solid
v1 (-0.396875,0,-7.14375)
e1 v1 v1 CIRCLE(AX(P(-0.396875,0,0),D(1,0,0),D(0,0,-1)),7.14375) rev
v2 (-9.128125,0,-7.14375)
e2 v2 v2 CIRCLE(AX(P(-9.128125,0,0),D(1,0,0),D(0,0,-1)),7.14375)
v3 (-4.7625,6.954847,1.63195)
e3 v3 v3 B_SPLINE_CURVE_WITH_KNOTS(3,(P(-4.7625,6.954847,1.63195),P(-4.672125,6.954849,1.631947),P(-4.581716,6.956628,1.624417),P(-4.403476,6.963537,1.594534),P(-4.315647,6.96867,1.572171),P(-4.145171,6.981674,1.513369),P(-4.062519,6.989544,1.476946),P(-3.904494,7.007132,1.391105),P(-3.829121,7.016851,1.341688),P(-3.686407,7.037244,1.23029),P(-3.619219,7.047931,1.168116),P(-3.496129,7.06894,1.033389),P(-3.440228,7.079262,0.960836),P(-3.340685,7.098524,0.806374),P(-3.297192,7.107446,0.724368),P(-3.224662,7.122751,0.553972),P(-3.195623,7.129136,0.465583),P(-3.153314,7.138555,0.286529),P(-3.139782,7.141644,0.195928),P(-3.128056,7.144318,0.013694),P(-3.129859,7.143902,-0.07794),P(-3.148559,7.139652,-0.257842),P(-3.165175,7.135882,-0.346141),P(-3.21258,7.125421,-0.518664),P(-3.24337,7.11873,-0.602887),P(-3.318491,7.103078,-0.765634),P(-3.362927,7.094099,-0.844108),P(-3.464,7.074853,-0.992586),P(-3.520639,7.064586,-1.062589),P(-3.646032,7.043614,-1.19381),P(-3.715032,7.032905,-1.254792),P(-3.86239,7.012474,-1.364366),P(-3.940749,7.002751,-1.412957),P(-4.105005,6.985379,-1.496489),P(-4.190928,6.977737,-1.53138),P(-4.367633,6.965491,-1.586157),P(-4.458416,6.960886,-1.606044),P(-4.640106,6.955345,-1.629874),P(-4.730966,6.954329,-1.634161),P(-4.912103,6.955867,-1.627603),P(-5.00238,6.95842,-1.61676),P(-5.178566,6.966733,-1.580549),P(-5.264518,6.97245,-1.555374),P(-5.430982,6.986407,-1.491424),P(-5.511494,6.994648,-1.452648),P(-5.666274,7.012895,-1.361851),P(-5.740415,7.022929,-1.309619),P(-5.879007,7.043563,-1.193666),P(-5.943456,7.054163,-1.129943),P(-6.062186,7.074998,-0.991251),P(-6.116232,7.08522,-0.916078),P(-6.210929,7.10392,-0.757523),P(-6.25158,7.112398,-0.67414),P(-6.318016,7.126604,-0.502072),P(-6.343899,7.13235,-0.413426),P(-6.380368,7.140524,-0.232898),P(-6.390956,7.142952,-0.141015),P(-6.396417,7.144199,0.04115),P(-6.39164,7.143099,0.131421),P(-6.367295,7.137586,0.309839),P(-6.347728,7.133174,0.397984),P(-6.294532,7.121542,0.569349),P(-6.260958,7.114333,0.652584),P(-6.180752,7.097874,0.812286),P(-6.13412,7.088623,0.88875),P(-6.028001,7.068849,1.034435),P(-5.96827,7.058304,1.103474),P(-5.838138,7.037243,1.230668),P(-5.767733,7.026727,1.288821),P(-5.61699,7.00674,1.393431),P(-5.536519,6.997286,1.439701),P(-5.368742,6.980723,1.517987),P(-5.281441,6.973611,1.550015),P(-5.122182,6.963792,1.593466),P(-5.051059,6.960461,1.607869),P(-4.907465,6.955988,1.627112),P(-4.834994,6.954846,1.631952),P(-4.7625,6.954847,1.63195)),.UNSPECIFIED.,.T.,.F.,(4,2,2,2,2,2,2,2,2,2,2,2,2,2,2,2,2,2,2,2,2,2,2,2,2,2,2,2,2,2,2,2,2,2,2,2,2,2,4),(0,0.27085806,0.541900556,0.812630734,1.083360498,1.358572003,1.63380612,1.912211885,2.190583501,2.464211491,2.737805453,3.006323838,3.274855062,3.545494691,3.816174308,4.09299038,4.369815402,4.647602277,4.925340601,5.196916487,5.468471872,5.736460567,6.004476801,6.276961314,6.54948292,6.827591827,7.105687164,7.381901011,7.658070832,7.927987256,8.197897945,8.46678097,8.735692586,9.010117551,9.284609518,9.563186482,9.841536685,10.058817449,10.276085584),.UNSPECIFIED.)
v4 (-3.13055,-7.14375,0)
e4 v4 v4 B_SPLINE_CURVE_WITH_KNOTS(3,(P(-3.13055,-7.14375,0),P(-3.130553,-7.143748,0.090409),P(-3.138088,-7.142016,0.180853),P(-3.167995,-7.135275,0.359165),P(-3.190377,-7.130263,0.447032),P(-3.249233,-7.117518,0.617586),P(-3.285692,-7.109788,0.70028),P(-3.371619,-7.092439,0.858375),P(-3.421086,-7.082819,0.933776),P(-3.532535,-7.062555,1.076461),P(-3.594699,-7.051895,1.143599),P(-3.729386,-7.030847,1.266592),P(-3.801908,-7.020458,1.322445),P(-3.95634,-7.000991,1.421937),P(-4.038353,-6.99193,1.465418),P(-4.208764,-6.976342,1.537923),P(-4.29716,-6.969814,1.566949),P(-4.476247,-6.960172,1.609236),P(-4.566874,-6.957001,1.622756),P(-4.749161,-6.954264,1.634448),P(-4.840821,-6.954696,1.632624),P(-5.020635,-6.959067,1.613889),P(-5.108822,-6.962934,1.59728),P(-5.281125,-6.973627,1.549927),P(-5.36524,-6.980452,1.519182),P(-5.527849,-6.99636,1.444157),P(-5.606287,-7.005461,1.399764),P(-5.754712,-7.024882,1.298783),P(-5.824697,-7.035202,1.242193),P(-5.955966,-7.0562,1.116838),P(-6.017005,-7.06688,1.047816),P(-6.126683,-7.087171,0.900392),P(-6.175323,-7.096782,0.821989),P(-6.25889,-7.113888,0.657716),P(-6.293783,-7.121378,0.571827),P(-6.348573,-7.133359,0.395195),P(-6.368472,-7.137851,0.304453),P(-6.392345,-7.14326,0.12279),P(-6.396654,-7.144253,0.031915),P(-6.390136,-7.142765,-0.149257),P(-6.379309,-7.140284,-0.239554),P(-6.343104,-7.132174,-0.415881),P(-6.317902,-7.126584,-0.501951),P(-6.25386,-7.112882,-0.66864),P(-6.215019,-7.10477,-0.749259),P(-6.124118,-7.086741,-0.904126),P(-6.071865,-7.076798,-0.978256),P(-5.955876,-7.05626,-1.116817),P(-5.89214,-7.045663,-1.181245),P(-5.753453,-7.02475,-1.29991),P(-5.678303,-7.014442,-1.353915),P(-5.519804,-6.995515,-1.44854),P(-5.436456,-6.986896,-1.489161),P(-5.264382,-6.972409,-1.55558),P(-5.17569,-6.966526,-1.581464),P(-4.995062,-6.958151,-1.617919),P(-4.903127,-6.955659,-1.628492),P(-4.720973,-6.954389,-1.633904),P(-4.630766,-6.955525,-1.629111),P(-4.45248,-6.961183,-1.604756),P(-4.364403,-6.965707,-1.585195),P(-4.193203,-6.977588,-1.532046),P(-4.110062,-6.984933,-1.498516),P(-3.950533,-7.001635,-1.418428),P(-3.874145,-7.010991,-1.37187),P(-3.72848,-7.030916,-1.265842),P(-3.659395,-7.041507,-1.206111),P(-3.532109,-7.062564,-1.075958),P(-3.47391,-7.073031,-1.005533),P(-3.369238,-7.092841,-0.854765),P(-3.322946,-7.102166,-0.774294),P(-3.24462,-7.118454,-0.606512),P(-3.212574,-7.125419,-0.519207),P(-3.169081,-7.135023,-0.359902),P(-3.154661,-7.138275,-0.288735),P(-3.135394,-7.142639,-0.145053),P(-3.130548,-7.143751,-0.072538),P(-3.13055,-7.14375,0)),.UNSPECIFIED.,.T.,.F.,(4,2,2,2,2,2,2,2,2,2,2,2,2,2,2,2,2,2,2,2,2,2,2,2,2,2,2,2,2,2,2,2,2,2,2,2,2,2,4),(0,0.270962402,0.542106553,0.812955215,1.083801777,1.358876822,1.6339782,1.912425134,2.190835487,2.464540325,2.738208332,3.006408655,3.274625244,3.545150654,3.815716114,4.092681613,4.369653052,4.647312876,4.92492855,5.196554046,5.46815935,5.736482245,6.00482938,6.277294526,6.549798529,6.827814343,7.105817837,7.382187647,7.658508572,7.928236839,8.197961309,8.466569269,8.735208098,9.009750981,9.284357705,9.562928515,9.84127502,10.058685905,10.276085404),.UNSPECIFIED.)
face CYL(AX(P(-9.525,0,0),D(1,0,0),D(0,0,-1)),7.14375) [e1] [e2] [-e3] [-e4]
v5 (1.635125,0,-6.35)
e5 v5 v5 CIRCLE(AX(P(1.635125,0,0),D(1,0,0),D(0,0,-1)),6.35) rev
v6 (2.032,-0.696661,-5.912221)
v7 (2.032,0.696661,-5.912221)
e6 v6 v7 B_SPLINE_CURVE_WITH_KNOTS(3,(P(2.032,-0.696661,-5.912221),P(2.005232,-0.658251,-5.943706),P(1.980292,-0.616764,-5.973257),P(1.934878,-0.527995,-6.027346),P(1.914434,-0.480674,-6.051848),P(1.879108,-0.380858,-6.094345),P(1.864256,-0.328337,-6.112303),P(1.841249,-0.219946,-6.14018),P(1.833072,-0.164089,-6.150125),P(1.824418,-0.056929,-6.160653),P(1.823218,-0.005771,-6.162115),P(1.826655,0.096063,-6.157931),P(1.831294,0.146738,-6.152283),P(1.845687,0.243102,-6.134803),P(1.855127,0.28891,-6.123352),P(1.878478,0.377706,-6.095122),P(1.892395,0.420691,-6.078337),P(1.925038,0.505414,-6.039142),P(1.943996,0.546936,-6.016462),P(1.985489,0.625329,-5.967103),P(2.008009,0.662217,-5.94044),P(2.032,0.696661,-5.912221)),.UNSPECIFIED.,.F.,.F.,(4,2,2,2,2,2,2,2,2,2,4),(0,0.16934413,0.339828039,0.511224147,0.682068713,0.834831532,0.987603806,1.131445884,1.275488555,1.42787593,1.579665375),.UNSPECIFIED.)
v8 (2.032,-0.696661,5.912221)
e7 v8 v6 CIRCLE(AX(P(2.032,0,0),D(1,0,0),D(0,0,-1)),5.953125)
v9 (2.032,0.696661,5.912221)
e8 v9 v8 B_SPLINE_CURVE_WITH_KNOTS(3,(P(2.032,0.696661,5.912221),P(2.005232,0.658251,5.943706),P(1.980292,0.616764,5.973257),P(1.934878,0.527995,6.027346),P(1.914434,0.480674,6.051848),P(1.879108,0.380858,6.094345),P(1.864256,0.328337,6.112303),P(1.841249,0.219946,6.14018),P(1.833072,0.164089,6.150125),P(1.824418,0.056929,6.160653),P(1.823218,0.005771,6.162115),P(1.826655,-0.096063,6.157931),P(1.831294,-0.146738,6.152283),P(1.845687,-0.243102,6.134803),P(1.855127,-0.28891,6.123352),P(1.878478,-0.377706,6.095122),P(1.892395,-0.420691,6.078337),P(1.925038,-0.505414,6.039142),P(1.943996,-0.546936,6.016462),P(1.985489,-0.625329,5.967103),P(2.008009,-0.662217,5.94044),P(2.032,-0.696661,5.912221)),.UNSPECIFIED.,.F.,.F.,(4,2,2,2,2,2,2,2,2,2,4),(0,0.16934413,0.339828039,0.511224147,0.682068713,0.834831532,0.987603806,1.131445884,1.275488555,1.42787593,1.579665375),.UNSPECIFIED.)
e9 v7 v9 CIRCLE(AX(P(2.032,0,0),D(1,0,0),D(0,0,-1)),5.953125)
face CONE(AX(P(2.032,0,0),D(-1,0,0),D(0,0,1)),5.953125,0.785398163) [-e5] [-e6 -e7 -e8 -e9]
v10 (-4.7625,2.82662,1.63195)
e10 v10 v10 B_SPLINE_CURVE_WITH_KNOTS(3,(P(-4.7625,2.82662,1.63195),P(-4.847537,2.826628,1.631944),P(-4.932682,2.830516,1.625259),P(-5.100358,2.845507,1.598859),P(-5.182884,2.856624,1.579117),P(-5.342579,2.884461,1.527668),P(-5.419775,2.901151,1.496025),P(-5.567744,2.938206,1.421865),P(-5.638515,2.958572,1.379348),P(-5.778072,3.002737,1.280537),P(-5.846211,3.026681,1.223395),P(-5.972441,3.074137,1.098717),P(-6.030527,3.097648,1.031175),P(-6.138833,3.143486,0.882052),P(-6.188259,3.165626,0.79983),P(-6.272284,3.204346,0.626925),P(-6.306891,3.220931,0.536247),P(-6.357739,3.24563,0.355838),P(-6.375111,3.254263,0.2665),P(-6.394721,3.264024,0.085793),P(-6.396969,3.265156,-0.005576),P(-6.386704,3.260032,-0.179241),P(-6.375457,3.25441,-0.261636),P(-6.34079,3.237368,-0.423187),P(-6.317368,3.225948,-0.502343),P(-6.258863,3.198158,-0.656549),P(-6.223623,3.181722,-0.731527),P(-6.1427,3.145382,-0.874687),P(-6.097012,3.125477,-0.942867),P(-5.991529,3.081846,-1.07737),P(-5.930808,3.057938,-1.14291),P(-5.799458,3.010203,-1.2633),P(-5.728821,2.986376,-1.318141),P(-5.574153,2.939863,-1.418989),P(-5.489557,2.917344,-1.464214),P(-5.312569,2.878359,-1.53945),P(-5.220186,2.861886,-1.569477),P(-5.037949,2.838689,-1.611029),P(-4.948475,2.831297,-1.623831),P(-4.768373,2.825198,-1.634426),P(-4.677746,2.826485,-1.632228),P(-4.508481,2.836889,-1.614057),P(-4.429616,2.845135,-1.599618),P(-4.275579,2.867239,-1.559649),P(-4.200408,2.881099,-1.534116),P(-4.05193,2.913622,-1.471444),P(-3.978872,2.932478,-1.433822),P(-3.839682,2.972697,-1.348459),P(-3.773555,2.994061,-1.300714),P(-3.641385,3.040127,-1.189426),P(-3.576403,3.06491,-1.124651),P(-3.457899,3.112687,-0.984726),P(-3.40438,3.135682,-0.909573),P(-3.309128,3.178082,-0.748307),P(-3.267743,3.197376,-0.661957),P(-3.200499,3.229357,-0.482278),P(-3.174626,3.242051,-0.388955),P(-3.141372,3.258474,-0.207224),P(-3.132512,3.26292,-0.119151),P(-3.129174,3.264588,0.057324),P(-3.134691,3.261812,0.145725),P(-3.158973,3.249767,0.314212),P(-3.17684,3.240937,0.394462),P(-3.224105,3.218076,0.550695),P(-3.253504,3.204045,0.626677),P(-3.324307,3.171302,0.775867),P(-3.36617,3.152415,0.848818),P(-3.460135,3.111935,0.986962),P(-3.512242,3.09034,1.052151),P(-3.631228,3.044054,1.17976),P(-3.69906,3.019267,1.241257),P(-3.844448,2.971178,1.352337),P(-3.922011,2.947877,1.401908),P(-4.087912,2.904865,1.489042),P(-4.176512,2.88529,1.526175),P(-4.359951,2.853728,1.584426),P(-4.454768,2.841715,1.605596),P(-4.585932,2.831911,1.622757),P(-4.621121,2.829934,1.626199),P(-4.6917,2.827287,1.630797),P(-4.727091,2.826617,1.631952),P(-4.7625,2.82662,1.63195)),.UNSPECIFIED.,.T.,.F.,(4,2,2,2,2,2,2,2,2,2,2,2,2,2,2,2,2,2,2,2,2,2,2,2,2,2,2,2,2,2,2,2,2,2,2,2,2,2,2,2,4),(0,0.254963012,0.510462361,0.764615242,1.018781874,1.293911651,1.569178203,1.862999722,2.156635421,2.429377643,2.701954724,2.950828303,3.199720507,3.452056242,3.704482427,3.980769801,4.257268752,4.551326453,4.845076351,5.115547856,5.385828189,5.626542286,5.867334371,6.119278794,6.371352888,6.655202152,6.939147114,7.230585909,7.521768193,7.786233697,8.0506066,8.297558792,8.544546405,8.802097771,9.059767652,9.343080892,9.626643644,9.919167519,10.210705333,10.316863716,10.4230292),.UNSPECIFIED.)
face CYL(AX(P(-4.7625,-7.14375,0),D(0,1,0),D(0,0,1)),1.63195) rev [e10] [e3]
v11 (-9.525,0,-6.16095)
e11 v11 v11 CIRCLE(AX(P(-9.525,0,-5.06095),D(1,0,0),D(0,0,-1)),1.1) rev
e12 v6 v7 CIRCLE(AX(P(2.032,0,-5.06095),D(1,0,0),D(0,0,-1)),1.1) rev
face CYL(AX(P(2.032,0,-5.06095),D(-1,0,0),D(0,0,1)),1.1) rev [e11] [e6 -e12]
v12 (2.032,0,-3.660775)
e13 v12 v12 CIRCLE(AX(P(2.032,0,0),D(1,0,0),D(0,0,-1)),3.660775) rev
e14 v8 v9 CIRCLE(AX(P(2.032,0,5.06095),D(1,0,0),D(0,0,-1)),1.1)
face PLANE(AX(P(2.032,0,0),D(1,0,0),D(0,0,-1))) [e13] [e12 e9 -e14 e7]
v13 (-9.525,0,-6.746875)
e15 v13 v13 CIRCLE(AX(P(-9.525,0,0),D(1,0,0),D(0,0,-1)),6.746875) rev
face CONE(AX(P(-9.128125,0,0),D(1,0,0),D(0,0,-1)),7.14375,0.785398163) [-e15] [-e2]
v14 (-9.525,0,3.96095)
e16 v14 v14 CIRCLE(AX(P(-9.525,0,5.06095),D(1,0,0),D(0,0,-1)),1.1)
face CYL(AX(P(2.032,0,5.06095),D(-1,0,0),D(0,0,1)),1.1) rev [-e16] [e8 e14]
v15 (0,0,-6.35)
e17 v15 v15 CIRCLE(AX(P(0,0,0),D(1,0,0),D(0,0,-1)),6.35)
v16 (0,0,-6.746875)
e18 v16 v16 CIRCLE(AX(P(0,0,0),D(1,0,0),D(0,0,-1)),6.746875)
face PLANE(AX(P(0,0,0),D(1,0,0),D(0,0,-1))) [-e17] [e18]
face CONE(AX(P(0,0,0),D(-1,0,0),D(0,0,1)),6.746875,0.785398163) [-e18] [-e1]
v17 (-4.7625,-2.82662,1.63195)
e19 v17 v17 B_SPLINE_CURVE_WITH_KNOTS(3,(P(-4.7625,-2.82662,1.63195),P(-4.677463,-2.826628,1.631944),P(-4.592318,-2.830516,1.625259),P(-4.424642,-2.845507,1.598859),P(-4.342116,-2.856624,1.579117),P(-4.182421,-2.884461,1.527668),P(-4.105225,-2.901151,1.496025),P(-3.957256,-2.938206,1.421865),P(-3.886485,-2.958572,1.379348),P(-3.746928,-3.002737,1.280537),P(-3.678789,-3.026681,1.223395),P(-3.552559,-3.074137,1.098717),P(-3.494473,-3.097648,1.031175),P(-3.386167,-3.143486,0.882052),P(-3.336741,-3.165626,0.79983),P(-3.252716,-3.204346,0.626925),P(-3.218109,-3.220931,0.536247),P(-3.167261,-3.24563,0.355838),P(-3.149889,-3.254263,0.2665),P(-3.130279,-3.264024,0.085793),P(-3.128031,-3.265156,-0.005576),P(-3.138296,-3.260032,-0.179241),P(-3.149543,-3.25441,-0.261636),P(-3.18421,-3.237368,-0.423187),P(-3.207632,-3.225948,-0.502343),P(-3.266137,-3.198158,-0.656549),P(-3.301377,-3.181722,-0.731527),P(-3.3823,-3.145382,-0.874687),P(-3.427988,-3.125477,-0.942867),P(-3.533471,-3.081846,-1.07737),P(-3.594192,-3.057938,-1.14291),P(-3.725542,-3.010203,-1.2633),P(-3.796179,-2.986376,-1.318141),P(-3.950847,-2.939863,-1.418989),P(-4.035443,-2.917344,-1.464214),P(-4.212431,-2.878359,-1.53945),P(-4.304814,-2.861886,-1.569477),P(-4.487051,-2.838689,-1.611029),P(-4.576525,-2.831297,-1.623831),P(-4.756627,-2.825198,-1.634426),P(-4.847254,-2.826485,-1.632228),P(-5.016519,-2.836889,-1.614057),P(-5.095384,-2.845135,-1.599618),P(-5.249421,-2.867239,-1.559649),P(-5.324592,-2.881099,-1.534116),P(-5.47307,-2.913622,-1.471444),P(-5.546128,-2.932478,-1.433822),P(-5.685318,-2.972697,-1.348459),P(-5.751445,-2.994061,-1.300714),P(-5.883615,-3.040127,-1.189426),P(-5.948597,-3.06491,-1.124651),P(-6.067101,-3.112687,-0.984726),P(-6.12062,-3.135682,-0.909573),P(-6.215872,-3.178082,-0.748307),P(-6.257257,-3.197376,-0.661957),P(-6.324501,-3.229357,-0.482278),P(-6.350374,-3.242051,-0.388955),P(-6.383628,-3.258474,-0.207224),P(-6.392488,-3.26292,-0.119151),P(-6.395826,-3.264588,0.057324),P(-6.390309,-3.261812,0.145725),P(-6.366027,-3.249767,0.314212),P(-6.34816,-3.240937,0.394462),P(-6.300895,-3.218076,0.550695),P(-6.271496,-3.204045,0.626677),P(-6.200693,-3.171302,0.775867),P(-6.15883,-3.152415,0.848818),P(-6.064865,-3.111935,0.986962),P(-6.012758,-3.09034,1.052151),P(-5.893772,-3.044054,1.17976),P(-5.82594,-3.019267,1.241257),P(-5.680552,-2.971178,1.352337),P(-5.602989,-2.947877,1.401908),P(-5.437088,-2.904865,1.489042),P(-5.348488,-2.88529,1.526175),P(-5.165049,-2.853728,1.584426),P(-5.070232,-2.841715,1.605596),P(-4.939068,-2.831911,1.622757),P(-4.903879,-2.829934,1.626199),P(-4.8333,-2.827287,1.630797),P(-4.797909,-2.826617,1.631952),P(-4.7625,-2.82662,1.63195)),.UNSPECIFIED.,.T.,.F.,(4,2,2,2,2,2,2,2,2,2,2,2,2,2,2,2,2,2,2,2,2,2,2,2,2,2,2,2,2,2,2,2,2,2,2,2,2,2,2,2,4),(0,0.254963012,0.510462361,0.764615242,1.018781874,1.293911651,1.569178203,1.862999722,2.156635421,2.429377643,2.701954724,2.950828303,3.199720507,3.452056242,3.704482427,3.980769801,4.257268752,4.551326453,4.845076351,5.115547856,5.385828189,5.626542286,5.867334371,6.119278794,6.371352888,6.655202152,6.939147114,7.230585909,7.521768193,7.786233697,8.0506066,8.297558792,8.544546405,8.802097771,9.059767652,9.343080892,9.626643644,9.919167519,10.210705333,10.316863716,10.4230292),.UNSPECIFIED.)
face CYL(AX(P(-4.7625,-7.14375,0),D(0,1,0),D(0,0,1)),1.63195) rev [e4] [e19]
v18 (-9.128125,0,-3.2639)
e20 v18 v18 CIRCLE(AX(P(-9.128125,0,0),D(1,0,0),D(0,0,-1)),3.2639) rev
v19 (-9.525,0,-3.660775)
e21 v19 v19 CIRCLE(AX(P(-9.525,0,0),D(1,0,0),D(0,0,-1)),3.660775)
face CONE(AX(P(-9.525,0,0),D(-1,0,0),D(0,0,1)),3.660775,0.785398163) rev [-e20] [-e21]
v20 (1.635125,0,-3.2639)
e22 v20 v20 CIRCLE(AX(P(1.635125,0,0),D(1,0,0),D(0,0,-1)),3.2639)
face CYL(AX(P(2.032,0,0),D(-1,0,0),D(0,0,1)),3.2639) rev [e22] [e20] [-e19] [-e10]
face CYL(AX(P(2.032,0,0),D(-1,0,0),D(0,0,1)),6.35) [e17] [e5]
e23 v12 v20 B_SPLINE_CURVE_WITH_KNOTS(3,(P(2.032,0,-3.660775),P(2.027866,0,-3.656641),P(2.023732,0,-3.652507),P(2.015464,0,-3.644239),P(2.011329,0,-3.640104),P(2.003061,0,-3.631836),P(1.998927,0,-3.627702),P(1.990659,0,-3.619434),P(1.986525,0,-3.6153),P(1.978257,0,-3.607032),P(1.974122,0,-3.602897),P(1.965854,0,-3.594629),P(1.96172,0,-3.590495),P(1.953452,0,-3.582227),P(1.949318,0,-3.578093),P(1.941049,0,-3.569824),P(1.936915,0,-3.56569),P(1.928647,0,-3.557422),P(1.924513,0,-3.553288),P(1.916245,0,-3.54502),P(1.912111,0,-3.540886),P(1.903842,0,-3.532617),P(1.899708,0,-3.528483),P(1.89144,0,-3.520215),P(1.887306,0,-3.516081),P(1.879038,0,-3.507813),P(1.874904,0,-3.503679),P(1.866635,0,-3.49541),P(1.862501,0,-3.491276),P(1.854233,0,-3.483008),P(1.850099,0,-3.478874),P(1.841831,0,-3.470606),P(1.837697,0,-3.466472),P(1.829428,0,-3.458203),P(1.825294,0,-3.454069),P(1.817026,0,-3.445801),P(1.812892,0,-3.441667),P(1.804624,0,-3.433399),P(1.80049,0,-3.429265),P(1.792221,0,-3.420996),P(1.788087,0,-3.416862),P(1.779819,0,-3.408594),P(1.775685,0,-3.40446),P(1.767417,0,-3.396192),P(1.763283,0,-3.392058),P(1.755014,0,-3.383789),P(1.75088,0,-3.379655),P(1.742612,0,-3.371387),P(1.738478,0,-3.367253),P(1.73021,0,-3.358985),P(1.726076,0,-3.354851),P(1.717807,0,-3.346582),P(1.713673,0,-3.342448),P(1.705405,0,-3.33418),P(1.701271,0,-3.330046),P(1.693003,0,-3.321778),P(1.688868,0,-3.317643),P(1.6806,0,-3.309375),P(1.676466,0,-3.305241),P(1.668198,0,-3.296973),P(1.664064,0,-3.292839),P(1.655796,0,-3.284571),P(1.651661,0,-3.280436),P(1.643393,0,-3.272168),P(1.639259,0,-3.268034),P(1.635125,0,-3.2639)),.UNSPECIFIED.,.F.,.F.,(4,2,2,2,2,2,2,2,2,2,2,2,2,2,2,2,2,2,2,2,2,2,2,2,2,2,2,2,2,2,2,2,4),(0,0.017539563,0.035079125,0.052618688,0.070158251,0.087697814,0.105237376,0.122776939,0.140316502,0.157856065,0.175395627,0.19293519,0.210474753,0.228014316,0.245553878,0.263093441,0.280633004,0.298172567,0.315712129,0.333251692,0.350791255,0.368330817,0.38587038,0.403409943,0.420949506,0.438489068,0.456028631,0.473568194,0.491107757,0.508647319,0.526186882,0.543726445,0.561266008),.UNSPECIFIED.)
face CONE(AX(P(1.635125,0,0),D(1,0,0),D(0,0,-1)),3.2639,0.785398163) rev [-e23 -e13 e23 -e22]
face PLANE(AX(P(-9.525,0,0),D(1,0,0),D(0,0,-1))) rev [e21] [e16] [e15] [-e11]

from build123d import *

# Parameters (mm, degrees)
SKETCH1_R                                 = 6.35
SKETCH1_R_2                               = 3.2639
SKETCH1_R_3                               = 1.099999959
INNER_SIDE_EXTRUDE_DEPTH                  = 2.032
OUTER_START                               = -9.525
SKETCH1_3_R                               = 7.14375
SKETCH1_3_R_2                             = 6.35
SKETCH1_3_R_3                             = 3.2639
SKETCH1_3_R_4                             = 1.099999959
OUTER_SIDE_EXTRUDE_DEPTH                  = 9.525
CLEVIS_PIN_CUT_DEPTH                      = 14.8849542
CLEVIS_PIN_CUT_DEPTH_BACK                 = 14.8849542
SKETCH2_R                                 = 1.63195
CHAMFER_SO_STEVE_DOESN_T_CUT_HIMSELF_SIZE = 0.396875


with BuildPart() as part:
    # Sketch1 → Inner Side Extrude (new body)
    with BuildSketch(Plane(origin=(0, 0, 0), x_dir=(0, 0, -1), z_dir=(1, 0, 0))):
        Circle(SKETCH1_R)
        Circle(SKETCH1_R_2, mode=Mode.SUBTRACT)
        with Locations((-5.06095, 0)):
            Circle(SKETCH1_R_3, mode=Mode.SUBTRACT)
        with Locations((5.06095, 0)):
            Circle(SKETCH1_R_3, mode=Mode.SUBTRACT)
    extrude(amount=INNER_SIDE_EXTRUDE_DEPTH)

    # Sketch1<3> → Outer Side Extrude (add)
    # profile 1 of 2: a face of its own
    with BuildSketch(Plane(origin=(0, 0, 0), x_dir=(0, 0, -1), z_dir=(1, 0, 0)).offset(OUTER_START)):
        Circle(SKETCH1_3_R)
        Circle(SKETCH1_3_R_2, mode=Mode.SUBTRACT)
    # profile 2 of 2: a face of its own
    with BuildSketch(Plane(origin=(0, 0, 0), x_dir=(0, 0, -1), z_dir=(1, 0, 0)).offset(OUTER_START)):
        Circle(SKETCH1_3_R_2)
        Circle(SKETCH1_3_R_3, mode=Mode.SUBTRACT)
        with Locations((-5.06095, 0)):
            Circle(SKETCH1_3_R_4, mode=Mode.SUBTRACT)
        with Locations((5.06095, 0)):
            Circle(SKETCH1_3_R_4, mode=Mode.SUBTRACT)
    extrude(amount=OUTER_SIDE_EXTRUDE_DEPTH)

    # Sketch2 → Clevis Pin Cut (cut, two sides: drawn at the far end of the back side and taken through both)
    with BuildSketch(Plane(origin=(0, 0, 0), x_dir=(1, 0, 0), z_dir=(0, 1, 0)).offset(-CLEVIS_PIN_CUT_DEPTH_BACK)):
        with Locations(Location((-4.7625, 0, 0), (0, 0, 270))):
            Circle(SKETCH2_R)
    extrude(amount=CLEVIS_PIN_CUT_DEPTH + CLEVIS_PIN_CUT_DEPTH_BACK, mode=Mode.SUBTRACT)

    # Chamfer so Steve Doesn't cut himself
    # the kernel refuses this chamfer: 0.396875 mm, written as the material it takes off along each edge
    with BuildSketch(Plane(origin=(2.032, 0, 0), x_dir=(0, 0, -1), z_dir=(0, -1, 0))) as chamfer_so_steve_doesn_t_cut_himself_piece_1:
        Polygon((3.2639 + CHAMFER_SO_STEVE_DOESN_T_CUT_HIMSELF_SIZE, 0), (3.2639, -CHAMFER_SO_STEVE_DOESN_T_CUT_HIMSELF_SIZE), (3.2639, 0), align=None)
    revolve(axis=Axis((2.032, 0, 0), (1, 0, 0)), mode=Mode.SUBTRACT)
    with BuildSketch(Plane(origin=(-9.525, 0, 0), x_dir=(0, 0, -1), z_dir=(0, -1, 0))) as chamfer_so_steve_doesn_t_cut_himself_piece_2:
        Polygon((7.14375, CHAMFER_SO_STEVE_DOESN_T_CUT_HIMSELF_SIZE), (7.14375 - CHAMFER_SO_STEVE_DOESN_T_CUT_HIMSELF_SIZE, 0), (7.14375, 0), align=None)
    revolve(axis=Axis((-9.525, 0, 0), (1, 0, 0)), mode=Mode.SUBTRACT)
    with BuildSketch(Plane(origin=(-9.525, 0, 0), x_dir=(0, 0, -1), z_dir=(0, -1, 0))) as chamfer_so_steve_doesn_t_cut_himself_piece_3:
        Polygon((3.2639, CHAMFER_SO_STEVE_DOESN_T_CUT_HIMSELF_SIZE), (3.2639 + CHAMFER_SO_STEVE_DOESN_T_CUT_HIMSELF_SIZE, 0), (3.2639, 0), align=None)
    revolve(axis=Axis((-9.525, 0, 0), (1, 0, 0)), mode=Mode.SUBTRACT)
    with BuildSketch(Plane(origin=(0, 0, 0), x_dir=(0, 0, -1), z_dir=(0, -1, 0))) as chamfer_so_steve_doesn_t_cut_himself_piece_4:
        Polygon((7.14375 - CHAMFER_SO_STEVE_DOESN_T_CUT_HIMSELF_SIZE, 0), (7.14375, -CHAMFER_SO_STEVE_DOESN_T_CUT_HIMSELF_SIZE), (7.14375, 0), align=None)
    revolve(axis=Axis((0, 0, 0), (1, 0, 0)), mode=Mode.SUBTRACT)
    with BuildSketch(Plane(origin=(2.032, 0, 0), x_dir=(0, 0, -1), z_dir=(0, -1, 0))) as chamfer_so_steve_doesn_t_cut_himself_piece_5:
        Polygon((6.35, -CHAMFER_SO_STEVE_DOESN_T_CUT_HIMSELF_SIZE), (6.35 - CHAMFER_SO_STEVE_DOESN_T_CUT_HIMSELF_SIZE, 0), (6.35, 0), align=None)
    revolve(axis=Axis((2.032, 0, 0), (1, 0, 0)), mode=Mode.SUBTRACT)


solid = part.part
